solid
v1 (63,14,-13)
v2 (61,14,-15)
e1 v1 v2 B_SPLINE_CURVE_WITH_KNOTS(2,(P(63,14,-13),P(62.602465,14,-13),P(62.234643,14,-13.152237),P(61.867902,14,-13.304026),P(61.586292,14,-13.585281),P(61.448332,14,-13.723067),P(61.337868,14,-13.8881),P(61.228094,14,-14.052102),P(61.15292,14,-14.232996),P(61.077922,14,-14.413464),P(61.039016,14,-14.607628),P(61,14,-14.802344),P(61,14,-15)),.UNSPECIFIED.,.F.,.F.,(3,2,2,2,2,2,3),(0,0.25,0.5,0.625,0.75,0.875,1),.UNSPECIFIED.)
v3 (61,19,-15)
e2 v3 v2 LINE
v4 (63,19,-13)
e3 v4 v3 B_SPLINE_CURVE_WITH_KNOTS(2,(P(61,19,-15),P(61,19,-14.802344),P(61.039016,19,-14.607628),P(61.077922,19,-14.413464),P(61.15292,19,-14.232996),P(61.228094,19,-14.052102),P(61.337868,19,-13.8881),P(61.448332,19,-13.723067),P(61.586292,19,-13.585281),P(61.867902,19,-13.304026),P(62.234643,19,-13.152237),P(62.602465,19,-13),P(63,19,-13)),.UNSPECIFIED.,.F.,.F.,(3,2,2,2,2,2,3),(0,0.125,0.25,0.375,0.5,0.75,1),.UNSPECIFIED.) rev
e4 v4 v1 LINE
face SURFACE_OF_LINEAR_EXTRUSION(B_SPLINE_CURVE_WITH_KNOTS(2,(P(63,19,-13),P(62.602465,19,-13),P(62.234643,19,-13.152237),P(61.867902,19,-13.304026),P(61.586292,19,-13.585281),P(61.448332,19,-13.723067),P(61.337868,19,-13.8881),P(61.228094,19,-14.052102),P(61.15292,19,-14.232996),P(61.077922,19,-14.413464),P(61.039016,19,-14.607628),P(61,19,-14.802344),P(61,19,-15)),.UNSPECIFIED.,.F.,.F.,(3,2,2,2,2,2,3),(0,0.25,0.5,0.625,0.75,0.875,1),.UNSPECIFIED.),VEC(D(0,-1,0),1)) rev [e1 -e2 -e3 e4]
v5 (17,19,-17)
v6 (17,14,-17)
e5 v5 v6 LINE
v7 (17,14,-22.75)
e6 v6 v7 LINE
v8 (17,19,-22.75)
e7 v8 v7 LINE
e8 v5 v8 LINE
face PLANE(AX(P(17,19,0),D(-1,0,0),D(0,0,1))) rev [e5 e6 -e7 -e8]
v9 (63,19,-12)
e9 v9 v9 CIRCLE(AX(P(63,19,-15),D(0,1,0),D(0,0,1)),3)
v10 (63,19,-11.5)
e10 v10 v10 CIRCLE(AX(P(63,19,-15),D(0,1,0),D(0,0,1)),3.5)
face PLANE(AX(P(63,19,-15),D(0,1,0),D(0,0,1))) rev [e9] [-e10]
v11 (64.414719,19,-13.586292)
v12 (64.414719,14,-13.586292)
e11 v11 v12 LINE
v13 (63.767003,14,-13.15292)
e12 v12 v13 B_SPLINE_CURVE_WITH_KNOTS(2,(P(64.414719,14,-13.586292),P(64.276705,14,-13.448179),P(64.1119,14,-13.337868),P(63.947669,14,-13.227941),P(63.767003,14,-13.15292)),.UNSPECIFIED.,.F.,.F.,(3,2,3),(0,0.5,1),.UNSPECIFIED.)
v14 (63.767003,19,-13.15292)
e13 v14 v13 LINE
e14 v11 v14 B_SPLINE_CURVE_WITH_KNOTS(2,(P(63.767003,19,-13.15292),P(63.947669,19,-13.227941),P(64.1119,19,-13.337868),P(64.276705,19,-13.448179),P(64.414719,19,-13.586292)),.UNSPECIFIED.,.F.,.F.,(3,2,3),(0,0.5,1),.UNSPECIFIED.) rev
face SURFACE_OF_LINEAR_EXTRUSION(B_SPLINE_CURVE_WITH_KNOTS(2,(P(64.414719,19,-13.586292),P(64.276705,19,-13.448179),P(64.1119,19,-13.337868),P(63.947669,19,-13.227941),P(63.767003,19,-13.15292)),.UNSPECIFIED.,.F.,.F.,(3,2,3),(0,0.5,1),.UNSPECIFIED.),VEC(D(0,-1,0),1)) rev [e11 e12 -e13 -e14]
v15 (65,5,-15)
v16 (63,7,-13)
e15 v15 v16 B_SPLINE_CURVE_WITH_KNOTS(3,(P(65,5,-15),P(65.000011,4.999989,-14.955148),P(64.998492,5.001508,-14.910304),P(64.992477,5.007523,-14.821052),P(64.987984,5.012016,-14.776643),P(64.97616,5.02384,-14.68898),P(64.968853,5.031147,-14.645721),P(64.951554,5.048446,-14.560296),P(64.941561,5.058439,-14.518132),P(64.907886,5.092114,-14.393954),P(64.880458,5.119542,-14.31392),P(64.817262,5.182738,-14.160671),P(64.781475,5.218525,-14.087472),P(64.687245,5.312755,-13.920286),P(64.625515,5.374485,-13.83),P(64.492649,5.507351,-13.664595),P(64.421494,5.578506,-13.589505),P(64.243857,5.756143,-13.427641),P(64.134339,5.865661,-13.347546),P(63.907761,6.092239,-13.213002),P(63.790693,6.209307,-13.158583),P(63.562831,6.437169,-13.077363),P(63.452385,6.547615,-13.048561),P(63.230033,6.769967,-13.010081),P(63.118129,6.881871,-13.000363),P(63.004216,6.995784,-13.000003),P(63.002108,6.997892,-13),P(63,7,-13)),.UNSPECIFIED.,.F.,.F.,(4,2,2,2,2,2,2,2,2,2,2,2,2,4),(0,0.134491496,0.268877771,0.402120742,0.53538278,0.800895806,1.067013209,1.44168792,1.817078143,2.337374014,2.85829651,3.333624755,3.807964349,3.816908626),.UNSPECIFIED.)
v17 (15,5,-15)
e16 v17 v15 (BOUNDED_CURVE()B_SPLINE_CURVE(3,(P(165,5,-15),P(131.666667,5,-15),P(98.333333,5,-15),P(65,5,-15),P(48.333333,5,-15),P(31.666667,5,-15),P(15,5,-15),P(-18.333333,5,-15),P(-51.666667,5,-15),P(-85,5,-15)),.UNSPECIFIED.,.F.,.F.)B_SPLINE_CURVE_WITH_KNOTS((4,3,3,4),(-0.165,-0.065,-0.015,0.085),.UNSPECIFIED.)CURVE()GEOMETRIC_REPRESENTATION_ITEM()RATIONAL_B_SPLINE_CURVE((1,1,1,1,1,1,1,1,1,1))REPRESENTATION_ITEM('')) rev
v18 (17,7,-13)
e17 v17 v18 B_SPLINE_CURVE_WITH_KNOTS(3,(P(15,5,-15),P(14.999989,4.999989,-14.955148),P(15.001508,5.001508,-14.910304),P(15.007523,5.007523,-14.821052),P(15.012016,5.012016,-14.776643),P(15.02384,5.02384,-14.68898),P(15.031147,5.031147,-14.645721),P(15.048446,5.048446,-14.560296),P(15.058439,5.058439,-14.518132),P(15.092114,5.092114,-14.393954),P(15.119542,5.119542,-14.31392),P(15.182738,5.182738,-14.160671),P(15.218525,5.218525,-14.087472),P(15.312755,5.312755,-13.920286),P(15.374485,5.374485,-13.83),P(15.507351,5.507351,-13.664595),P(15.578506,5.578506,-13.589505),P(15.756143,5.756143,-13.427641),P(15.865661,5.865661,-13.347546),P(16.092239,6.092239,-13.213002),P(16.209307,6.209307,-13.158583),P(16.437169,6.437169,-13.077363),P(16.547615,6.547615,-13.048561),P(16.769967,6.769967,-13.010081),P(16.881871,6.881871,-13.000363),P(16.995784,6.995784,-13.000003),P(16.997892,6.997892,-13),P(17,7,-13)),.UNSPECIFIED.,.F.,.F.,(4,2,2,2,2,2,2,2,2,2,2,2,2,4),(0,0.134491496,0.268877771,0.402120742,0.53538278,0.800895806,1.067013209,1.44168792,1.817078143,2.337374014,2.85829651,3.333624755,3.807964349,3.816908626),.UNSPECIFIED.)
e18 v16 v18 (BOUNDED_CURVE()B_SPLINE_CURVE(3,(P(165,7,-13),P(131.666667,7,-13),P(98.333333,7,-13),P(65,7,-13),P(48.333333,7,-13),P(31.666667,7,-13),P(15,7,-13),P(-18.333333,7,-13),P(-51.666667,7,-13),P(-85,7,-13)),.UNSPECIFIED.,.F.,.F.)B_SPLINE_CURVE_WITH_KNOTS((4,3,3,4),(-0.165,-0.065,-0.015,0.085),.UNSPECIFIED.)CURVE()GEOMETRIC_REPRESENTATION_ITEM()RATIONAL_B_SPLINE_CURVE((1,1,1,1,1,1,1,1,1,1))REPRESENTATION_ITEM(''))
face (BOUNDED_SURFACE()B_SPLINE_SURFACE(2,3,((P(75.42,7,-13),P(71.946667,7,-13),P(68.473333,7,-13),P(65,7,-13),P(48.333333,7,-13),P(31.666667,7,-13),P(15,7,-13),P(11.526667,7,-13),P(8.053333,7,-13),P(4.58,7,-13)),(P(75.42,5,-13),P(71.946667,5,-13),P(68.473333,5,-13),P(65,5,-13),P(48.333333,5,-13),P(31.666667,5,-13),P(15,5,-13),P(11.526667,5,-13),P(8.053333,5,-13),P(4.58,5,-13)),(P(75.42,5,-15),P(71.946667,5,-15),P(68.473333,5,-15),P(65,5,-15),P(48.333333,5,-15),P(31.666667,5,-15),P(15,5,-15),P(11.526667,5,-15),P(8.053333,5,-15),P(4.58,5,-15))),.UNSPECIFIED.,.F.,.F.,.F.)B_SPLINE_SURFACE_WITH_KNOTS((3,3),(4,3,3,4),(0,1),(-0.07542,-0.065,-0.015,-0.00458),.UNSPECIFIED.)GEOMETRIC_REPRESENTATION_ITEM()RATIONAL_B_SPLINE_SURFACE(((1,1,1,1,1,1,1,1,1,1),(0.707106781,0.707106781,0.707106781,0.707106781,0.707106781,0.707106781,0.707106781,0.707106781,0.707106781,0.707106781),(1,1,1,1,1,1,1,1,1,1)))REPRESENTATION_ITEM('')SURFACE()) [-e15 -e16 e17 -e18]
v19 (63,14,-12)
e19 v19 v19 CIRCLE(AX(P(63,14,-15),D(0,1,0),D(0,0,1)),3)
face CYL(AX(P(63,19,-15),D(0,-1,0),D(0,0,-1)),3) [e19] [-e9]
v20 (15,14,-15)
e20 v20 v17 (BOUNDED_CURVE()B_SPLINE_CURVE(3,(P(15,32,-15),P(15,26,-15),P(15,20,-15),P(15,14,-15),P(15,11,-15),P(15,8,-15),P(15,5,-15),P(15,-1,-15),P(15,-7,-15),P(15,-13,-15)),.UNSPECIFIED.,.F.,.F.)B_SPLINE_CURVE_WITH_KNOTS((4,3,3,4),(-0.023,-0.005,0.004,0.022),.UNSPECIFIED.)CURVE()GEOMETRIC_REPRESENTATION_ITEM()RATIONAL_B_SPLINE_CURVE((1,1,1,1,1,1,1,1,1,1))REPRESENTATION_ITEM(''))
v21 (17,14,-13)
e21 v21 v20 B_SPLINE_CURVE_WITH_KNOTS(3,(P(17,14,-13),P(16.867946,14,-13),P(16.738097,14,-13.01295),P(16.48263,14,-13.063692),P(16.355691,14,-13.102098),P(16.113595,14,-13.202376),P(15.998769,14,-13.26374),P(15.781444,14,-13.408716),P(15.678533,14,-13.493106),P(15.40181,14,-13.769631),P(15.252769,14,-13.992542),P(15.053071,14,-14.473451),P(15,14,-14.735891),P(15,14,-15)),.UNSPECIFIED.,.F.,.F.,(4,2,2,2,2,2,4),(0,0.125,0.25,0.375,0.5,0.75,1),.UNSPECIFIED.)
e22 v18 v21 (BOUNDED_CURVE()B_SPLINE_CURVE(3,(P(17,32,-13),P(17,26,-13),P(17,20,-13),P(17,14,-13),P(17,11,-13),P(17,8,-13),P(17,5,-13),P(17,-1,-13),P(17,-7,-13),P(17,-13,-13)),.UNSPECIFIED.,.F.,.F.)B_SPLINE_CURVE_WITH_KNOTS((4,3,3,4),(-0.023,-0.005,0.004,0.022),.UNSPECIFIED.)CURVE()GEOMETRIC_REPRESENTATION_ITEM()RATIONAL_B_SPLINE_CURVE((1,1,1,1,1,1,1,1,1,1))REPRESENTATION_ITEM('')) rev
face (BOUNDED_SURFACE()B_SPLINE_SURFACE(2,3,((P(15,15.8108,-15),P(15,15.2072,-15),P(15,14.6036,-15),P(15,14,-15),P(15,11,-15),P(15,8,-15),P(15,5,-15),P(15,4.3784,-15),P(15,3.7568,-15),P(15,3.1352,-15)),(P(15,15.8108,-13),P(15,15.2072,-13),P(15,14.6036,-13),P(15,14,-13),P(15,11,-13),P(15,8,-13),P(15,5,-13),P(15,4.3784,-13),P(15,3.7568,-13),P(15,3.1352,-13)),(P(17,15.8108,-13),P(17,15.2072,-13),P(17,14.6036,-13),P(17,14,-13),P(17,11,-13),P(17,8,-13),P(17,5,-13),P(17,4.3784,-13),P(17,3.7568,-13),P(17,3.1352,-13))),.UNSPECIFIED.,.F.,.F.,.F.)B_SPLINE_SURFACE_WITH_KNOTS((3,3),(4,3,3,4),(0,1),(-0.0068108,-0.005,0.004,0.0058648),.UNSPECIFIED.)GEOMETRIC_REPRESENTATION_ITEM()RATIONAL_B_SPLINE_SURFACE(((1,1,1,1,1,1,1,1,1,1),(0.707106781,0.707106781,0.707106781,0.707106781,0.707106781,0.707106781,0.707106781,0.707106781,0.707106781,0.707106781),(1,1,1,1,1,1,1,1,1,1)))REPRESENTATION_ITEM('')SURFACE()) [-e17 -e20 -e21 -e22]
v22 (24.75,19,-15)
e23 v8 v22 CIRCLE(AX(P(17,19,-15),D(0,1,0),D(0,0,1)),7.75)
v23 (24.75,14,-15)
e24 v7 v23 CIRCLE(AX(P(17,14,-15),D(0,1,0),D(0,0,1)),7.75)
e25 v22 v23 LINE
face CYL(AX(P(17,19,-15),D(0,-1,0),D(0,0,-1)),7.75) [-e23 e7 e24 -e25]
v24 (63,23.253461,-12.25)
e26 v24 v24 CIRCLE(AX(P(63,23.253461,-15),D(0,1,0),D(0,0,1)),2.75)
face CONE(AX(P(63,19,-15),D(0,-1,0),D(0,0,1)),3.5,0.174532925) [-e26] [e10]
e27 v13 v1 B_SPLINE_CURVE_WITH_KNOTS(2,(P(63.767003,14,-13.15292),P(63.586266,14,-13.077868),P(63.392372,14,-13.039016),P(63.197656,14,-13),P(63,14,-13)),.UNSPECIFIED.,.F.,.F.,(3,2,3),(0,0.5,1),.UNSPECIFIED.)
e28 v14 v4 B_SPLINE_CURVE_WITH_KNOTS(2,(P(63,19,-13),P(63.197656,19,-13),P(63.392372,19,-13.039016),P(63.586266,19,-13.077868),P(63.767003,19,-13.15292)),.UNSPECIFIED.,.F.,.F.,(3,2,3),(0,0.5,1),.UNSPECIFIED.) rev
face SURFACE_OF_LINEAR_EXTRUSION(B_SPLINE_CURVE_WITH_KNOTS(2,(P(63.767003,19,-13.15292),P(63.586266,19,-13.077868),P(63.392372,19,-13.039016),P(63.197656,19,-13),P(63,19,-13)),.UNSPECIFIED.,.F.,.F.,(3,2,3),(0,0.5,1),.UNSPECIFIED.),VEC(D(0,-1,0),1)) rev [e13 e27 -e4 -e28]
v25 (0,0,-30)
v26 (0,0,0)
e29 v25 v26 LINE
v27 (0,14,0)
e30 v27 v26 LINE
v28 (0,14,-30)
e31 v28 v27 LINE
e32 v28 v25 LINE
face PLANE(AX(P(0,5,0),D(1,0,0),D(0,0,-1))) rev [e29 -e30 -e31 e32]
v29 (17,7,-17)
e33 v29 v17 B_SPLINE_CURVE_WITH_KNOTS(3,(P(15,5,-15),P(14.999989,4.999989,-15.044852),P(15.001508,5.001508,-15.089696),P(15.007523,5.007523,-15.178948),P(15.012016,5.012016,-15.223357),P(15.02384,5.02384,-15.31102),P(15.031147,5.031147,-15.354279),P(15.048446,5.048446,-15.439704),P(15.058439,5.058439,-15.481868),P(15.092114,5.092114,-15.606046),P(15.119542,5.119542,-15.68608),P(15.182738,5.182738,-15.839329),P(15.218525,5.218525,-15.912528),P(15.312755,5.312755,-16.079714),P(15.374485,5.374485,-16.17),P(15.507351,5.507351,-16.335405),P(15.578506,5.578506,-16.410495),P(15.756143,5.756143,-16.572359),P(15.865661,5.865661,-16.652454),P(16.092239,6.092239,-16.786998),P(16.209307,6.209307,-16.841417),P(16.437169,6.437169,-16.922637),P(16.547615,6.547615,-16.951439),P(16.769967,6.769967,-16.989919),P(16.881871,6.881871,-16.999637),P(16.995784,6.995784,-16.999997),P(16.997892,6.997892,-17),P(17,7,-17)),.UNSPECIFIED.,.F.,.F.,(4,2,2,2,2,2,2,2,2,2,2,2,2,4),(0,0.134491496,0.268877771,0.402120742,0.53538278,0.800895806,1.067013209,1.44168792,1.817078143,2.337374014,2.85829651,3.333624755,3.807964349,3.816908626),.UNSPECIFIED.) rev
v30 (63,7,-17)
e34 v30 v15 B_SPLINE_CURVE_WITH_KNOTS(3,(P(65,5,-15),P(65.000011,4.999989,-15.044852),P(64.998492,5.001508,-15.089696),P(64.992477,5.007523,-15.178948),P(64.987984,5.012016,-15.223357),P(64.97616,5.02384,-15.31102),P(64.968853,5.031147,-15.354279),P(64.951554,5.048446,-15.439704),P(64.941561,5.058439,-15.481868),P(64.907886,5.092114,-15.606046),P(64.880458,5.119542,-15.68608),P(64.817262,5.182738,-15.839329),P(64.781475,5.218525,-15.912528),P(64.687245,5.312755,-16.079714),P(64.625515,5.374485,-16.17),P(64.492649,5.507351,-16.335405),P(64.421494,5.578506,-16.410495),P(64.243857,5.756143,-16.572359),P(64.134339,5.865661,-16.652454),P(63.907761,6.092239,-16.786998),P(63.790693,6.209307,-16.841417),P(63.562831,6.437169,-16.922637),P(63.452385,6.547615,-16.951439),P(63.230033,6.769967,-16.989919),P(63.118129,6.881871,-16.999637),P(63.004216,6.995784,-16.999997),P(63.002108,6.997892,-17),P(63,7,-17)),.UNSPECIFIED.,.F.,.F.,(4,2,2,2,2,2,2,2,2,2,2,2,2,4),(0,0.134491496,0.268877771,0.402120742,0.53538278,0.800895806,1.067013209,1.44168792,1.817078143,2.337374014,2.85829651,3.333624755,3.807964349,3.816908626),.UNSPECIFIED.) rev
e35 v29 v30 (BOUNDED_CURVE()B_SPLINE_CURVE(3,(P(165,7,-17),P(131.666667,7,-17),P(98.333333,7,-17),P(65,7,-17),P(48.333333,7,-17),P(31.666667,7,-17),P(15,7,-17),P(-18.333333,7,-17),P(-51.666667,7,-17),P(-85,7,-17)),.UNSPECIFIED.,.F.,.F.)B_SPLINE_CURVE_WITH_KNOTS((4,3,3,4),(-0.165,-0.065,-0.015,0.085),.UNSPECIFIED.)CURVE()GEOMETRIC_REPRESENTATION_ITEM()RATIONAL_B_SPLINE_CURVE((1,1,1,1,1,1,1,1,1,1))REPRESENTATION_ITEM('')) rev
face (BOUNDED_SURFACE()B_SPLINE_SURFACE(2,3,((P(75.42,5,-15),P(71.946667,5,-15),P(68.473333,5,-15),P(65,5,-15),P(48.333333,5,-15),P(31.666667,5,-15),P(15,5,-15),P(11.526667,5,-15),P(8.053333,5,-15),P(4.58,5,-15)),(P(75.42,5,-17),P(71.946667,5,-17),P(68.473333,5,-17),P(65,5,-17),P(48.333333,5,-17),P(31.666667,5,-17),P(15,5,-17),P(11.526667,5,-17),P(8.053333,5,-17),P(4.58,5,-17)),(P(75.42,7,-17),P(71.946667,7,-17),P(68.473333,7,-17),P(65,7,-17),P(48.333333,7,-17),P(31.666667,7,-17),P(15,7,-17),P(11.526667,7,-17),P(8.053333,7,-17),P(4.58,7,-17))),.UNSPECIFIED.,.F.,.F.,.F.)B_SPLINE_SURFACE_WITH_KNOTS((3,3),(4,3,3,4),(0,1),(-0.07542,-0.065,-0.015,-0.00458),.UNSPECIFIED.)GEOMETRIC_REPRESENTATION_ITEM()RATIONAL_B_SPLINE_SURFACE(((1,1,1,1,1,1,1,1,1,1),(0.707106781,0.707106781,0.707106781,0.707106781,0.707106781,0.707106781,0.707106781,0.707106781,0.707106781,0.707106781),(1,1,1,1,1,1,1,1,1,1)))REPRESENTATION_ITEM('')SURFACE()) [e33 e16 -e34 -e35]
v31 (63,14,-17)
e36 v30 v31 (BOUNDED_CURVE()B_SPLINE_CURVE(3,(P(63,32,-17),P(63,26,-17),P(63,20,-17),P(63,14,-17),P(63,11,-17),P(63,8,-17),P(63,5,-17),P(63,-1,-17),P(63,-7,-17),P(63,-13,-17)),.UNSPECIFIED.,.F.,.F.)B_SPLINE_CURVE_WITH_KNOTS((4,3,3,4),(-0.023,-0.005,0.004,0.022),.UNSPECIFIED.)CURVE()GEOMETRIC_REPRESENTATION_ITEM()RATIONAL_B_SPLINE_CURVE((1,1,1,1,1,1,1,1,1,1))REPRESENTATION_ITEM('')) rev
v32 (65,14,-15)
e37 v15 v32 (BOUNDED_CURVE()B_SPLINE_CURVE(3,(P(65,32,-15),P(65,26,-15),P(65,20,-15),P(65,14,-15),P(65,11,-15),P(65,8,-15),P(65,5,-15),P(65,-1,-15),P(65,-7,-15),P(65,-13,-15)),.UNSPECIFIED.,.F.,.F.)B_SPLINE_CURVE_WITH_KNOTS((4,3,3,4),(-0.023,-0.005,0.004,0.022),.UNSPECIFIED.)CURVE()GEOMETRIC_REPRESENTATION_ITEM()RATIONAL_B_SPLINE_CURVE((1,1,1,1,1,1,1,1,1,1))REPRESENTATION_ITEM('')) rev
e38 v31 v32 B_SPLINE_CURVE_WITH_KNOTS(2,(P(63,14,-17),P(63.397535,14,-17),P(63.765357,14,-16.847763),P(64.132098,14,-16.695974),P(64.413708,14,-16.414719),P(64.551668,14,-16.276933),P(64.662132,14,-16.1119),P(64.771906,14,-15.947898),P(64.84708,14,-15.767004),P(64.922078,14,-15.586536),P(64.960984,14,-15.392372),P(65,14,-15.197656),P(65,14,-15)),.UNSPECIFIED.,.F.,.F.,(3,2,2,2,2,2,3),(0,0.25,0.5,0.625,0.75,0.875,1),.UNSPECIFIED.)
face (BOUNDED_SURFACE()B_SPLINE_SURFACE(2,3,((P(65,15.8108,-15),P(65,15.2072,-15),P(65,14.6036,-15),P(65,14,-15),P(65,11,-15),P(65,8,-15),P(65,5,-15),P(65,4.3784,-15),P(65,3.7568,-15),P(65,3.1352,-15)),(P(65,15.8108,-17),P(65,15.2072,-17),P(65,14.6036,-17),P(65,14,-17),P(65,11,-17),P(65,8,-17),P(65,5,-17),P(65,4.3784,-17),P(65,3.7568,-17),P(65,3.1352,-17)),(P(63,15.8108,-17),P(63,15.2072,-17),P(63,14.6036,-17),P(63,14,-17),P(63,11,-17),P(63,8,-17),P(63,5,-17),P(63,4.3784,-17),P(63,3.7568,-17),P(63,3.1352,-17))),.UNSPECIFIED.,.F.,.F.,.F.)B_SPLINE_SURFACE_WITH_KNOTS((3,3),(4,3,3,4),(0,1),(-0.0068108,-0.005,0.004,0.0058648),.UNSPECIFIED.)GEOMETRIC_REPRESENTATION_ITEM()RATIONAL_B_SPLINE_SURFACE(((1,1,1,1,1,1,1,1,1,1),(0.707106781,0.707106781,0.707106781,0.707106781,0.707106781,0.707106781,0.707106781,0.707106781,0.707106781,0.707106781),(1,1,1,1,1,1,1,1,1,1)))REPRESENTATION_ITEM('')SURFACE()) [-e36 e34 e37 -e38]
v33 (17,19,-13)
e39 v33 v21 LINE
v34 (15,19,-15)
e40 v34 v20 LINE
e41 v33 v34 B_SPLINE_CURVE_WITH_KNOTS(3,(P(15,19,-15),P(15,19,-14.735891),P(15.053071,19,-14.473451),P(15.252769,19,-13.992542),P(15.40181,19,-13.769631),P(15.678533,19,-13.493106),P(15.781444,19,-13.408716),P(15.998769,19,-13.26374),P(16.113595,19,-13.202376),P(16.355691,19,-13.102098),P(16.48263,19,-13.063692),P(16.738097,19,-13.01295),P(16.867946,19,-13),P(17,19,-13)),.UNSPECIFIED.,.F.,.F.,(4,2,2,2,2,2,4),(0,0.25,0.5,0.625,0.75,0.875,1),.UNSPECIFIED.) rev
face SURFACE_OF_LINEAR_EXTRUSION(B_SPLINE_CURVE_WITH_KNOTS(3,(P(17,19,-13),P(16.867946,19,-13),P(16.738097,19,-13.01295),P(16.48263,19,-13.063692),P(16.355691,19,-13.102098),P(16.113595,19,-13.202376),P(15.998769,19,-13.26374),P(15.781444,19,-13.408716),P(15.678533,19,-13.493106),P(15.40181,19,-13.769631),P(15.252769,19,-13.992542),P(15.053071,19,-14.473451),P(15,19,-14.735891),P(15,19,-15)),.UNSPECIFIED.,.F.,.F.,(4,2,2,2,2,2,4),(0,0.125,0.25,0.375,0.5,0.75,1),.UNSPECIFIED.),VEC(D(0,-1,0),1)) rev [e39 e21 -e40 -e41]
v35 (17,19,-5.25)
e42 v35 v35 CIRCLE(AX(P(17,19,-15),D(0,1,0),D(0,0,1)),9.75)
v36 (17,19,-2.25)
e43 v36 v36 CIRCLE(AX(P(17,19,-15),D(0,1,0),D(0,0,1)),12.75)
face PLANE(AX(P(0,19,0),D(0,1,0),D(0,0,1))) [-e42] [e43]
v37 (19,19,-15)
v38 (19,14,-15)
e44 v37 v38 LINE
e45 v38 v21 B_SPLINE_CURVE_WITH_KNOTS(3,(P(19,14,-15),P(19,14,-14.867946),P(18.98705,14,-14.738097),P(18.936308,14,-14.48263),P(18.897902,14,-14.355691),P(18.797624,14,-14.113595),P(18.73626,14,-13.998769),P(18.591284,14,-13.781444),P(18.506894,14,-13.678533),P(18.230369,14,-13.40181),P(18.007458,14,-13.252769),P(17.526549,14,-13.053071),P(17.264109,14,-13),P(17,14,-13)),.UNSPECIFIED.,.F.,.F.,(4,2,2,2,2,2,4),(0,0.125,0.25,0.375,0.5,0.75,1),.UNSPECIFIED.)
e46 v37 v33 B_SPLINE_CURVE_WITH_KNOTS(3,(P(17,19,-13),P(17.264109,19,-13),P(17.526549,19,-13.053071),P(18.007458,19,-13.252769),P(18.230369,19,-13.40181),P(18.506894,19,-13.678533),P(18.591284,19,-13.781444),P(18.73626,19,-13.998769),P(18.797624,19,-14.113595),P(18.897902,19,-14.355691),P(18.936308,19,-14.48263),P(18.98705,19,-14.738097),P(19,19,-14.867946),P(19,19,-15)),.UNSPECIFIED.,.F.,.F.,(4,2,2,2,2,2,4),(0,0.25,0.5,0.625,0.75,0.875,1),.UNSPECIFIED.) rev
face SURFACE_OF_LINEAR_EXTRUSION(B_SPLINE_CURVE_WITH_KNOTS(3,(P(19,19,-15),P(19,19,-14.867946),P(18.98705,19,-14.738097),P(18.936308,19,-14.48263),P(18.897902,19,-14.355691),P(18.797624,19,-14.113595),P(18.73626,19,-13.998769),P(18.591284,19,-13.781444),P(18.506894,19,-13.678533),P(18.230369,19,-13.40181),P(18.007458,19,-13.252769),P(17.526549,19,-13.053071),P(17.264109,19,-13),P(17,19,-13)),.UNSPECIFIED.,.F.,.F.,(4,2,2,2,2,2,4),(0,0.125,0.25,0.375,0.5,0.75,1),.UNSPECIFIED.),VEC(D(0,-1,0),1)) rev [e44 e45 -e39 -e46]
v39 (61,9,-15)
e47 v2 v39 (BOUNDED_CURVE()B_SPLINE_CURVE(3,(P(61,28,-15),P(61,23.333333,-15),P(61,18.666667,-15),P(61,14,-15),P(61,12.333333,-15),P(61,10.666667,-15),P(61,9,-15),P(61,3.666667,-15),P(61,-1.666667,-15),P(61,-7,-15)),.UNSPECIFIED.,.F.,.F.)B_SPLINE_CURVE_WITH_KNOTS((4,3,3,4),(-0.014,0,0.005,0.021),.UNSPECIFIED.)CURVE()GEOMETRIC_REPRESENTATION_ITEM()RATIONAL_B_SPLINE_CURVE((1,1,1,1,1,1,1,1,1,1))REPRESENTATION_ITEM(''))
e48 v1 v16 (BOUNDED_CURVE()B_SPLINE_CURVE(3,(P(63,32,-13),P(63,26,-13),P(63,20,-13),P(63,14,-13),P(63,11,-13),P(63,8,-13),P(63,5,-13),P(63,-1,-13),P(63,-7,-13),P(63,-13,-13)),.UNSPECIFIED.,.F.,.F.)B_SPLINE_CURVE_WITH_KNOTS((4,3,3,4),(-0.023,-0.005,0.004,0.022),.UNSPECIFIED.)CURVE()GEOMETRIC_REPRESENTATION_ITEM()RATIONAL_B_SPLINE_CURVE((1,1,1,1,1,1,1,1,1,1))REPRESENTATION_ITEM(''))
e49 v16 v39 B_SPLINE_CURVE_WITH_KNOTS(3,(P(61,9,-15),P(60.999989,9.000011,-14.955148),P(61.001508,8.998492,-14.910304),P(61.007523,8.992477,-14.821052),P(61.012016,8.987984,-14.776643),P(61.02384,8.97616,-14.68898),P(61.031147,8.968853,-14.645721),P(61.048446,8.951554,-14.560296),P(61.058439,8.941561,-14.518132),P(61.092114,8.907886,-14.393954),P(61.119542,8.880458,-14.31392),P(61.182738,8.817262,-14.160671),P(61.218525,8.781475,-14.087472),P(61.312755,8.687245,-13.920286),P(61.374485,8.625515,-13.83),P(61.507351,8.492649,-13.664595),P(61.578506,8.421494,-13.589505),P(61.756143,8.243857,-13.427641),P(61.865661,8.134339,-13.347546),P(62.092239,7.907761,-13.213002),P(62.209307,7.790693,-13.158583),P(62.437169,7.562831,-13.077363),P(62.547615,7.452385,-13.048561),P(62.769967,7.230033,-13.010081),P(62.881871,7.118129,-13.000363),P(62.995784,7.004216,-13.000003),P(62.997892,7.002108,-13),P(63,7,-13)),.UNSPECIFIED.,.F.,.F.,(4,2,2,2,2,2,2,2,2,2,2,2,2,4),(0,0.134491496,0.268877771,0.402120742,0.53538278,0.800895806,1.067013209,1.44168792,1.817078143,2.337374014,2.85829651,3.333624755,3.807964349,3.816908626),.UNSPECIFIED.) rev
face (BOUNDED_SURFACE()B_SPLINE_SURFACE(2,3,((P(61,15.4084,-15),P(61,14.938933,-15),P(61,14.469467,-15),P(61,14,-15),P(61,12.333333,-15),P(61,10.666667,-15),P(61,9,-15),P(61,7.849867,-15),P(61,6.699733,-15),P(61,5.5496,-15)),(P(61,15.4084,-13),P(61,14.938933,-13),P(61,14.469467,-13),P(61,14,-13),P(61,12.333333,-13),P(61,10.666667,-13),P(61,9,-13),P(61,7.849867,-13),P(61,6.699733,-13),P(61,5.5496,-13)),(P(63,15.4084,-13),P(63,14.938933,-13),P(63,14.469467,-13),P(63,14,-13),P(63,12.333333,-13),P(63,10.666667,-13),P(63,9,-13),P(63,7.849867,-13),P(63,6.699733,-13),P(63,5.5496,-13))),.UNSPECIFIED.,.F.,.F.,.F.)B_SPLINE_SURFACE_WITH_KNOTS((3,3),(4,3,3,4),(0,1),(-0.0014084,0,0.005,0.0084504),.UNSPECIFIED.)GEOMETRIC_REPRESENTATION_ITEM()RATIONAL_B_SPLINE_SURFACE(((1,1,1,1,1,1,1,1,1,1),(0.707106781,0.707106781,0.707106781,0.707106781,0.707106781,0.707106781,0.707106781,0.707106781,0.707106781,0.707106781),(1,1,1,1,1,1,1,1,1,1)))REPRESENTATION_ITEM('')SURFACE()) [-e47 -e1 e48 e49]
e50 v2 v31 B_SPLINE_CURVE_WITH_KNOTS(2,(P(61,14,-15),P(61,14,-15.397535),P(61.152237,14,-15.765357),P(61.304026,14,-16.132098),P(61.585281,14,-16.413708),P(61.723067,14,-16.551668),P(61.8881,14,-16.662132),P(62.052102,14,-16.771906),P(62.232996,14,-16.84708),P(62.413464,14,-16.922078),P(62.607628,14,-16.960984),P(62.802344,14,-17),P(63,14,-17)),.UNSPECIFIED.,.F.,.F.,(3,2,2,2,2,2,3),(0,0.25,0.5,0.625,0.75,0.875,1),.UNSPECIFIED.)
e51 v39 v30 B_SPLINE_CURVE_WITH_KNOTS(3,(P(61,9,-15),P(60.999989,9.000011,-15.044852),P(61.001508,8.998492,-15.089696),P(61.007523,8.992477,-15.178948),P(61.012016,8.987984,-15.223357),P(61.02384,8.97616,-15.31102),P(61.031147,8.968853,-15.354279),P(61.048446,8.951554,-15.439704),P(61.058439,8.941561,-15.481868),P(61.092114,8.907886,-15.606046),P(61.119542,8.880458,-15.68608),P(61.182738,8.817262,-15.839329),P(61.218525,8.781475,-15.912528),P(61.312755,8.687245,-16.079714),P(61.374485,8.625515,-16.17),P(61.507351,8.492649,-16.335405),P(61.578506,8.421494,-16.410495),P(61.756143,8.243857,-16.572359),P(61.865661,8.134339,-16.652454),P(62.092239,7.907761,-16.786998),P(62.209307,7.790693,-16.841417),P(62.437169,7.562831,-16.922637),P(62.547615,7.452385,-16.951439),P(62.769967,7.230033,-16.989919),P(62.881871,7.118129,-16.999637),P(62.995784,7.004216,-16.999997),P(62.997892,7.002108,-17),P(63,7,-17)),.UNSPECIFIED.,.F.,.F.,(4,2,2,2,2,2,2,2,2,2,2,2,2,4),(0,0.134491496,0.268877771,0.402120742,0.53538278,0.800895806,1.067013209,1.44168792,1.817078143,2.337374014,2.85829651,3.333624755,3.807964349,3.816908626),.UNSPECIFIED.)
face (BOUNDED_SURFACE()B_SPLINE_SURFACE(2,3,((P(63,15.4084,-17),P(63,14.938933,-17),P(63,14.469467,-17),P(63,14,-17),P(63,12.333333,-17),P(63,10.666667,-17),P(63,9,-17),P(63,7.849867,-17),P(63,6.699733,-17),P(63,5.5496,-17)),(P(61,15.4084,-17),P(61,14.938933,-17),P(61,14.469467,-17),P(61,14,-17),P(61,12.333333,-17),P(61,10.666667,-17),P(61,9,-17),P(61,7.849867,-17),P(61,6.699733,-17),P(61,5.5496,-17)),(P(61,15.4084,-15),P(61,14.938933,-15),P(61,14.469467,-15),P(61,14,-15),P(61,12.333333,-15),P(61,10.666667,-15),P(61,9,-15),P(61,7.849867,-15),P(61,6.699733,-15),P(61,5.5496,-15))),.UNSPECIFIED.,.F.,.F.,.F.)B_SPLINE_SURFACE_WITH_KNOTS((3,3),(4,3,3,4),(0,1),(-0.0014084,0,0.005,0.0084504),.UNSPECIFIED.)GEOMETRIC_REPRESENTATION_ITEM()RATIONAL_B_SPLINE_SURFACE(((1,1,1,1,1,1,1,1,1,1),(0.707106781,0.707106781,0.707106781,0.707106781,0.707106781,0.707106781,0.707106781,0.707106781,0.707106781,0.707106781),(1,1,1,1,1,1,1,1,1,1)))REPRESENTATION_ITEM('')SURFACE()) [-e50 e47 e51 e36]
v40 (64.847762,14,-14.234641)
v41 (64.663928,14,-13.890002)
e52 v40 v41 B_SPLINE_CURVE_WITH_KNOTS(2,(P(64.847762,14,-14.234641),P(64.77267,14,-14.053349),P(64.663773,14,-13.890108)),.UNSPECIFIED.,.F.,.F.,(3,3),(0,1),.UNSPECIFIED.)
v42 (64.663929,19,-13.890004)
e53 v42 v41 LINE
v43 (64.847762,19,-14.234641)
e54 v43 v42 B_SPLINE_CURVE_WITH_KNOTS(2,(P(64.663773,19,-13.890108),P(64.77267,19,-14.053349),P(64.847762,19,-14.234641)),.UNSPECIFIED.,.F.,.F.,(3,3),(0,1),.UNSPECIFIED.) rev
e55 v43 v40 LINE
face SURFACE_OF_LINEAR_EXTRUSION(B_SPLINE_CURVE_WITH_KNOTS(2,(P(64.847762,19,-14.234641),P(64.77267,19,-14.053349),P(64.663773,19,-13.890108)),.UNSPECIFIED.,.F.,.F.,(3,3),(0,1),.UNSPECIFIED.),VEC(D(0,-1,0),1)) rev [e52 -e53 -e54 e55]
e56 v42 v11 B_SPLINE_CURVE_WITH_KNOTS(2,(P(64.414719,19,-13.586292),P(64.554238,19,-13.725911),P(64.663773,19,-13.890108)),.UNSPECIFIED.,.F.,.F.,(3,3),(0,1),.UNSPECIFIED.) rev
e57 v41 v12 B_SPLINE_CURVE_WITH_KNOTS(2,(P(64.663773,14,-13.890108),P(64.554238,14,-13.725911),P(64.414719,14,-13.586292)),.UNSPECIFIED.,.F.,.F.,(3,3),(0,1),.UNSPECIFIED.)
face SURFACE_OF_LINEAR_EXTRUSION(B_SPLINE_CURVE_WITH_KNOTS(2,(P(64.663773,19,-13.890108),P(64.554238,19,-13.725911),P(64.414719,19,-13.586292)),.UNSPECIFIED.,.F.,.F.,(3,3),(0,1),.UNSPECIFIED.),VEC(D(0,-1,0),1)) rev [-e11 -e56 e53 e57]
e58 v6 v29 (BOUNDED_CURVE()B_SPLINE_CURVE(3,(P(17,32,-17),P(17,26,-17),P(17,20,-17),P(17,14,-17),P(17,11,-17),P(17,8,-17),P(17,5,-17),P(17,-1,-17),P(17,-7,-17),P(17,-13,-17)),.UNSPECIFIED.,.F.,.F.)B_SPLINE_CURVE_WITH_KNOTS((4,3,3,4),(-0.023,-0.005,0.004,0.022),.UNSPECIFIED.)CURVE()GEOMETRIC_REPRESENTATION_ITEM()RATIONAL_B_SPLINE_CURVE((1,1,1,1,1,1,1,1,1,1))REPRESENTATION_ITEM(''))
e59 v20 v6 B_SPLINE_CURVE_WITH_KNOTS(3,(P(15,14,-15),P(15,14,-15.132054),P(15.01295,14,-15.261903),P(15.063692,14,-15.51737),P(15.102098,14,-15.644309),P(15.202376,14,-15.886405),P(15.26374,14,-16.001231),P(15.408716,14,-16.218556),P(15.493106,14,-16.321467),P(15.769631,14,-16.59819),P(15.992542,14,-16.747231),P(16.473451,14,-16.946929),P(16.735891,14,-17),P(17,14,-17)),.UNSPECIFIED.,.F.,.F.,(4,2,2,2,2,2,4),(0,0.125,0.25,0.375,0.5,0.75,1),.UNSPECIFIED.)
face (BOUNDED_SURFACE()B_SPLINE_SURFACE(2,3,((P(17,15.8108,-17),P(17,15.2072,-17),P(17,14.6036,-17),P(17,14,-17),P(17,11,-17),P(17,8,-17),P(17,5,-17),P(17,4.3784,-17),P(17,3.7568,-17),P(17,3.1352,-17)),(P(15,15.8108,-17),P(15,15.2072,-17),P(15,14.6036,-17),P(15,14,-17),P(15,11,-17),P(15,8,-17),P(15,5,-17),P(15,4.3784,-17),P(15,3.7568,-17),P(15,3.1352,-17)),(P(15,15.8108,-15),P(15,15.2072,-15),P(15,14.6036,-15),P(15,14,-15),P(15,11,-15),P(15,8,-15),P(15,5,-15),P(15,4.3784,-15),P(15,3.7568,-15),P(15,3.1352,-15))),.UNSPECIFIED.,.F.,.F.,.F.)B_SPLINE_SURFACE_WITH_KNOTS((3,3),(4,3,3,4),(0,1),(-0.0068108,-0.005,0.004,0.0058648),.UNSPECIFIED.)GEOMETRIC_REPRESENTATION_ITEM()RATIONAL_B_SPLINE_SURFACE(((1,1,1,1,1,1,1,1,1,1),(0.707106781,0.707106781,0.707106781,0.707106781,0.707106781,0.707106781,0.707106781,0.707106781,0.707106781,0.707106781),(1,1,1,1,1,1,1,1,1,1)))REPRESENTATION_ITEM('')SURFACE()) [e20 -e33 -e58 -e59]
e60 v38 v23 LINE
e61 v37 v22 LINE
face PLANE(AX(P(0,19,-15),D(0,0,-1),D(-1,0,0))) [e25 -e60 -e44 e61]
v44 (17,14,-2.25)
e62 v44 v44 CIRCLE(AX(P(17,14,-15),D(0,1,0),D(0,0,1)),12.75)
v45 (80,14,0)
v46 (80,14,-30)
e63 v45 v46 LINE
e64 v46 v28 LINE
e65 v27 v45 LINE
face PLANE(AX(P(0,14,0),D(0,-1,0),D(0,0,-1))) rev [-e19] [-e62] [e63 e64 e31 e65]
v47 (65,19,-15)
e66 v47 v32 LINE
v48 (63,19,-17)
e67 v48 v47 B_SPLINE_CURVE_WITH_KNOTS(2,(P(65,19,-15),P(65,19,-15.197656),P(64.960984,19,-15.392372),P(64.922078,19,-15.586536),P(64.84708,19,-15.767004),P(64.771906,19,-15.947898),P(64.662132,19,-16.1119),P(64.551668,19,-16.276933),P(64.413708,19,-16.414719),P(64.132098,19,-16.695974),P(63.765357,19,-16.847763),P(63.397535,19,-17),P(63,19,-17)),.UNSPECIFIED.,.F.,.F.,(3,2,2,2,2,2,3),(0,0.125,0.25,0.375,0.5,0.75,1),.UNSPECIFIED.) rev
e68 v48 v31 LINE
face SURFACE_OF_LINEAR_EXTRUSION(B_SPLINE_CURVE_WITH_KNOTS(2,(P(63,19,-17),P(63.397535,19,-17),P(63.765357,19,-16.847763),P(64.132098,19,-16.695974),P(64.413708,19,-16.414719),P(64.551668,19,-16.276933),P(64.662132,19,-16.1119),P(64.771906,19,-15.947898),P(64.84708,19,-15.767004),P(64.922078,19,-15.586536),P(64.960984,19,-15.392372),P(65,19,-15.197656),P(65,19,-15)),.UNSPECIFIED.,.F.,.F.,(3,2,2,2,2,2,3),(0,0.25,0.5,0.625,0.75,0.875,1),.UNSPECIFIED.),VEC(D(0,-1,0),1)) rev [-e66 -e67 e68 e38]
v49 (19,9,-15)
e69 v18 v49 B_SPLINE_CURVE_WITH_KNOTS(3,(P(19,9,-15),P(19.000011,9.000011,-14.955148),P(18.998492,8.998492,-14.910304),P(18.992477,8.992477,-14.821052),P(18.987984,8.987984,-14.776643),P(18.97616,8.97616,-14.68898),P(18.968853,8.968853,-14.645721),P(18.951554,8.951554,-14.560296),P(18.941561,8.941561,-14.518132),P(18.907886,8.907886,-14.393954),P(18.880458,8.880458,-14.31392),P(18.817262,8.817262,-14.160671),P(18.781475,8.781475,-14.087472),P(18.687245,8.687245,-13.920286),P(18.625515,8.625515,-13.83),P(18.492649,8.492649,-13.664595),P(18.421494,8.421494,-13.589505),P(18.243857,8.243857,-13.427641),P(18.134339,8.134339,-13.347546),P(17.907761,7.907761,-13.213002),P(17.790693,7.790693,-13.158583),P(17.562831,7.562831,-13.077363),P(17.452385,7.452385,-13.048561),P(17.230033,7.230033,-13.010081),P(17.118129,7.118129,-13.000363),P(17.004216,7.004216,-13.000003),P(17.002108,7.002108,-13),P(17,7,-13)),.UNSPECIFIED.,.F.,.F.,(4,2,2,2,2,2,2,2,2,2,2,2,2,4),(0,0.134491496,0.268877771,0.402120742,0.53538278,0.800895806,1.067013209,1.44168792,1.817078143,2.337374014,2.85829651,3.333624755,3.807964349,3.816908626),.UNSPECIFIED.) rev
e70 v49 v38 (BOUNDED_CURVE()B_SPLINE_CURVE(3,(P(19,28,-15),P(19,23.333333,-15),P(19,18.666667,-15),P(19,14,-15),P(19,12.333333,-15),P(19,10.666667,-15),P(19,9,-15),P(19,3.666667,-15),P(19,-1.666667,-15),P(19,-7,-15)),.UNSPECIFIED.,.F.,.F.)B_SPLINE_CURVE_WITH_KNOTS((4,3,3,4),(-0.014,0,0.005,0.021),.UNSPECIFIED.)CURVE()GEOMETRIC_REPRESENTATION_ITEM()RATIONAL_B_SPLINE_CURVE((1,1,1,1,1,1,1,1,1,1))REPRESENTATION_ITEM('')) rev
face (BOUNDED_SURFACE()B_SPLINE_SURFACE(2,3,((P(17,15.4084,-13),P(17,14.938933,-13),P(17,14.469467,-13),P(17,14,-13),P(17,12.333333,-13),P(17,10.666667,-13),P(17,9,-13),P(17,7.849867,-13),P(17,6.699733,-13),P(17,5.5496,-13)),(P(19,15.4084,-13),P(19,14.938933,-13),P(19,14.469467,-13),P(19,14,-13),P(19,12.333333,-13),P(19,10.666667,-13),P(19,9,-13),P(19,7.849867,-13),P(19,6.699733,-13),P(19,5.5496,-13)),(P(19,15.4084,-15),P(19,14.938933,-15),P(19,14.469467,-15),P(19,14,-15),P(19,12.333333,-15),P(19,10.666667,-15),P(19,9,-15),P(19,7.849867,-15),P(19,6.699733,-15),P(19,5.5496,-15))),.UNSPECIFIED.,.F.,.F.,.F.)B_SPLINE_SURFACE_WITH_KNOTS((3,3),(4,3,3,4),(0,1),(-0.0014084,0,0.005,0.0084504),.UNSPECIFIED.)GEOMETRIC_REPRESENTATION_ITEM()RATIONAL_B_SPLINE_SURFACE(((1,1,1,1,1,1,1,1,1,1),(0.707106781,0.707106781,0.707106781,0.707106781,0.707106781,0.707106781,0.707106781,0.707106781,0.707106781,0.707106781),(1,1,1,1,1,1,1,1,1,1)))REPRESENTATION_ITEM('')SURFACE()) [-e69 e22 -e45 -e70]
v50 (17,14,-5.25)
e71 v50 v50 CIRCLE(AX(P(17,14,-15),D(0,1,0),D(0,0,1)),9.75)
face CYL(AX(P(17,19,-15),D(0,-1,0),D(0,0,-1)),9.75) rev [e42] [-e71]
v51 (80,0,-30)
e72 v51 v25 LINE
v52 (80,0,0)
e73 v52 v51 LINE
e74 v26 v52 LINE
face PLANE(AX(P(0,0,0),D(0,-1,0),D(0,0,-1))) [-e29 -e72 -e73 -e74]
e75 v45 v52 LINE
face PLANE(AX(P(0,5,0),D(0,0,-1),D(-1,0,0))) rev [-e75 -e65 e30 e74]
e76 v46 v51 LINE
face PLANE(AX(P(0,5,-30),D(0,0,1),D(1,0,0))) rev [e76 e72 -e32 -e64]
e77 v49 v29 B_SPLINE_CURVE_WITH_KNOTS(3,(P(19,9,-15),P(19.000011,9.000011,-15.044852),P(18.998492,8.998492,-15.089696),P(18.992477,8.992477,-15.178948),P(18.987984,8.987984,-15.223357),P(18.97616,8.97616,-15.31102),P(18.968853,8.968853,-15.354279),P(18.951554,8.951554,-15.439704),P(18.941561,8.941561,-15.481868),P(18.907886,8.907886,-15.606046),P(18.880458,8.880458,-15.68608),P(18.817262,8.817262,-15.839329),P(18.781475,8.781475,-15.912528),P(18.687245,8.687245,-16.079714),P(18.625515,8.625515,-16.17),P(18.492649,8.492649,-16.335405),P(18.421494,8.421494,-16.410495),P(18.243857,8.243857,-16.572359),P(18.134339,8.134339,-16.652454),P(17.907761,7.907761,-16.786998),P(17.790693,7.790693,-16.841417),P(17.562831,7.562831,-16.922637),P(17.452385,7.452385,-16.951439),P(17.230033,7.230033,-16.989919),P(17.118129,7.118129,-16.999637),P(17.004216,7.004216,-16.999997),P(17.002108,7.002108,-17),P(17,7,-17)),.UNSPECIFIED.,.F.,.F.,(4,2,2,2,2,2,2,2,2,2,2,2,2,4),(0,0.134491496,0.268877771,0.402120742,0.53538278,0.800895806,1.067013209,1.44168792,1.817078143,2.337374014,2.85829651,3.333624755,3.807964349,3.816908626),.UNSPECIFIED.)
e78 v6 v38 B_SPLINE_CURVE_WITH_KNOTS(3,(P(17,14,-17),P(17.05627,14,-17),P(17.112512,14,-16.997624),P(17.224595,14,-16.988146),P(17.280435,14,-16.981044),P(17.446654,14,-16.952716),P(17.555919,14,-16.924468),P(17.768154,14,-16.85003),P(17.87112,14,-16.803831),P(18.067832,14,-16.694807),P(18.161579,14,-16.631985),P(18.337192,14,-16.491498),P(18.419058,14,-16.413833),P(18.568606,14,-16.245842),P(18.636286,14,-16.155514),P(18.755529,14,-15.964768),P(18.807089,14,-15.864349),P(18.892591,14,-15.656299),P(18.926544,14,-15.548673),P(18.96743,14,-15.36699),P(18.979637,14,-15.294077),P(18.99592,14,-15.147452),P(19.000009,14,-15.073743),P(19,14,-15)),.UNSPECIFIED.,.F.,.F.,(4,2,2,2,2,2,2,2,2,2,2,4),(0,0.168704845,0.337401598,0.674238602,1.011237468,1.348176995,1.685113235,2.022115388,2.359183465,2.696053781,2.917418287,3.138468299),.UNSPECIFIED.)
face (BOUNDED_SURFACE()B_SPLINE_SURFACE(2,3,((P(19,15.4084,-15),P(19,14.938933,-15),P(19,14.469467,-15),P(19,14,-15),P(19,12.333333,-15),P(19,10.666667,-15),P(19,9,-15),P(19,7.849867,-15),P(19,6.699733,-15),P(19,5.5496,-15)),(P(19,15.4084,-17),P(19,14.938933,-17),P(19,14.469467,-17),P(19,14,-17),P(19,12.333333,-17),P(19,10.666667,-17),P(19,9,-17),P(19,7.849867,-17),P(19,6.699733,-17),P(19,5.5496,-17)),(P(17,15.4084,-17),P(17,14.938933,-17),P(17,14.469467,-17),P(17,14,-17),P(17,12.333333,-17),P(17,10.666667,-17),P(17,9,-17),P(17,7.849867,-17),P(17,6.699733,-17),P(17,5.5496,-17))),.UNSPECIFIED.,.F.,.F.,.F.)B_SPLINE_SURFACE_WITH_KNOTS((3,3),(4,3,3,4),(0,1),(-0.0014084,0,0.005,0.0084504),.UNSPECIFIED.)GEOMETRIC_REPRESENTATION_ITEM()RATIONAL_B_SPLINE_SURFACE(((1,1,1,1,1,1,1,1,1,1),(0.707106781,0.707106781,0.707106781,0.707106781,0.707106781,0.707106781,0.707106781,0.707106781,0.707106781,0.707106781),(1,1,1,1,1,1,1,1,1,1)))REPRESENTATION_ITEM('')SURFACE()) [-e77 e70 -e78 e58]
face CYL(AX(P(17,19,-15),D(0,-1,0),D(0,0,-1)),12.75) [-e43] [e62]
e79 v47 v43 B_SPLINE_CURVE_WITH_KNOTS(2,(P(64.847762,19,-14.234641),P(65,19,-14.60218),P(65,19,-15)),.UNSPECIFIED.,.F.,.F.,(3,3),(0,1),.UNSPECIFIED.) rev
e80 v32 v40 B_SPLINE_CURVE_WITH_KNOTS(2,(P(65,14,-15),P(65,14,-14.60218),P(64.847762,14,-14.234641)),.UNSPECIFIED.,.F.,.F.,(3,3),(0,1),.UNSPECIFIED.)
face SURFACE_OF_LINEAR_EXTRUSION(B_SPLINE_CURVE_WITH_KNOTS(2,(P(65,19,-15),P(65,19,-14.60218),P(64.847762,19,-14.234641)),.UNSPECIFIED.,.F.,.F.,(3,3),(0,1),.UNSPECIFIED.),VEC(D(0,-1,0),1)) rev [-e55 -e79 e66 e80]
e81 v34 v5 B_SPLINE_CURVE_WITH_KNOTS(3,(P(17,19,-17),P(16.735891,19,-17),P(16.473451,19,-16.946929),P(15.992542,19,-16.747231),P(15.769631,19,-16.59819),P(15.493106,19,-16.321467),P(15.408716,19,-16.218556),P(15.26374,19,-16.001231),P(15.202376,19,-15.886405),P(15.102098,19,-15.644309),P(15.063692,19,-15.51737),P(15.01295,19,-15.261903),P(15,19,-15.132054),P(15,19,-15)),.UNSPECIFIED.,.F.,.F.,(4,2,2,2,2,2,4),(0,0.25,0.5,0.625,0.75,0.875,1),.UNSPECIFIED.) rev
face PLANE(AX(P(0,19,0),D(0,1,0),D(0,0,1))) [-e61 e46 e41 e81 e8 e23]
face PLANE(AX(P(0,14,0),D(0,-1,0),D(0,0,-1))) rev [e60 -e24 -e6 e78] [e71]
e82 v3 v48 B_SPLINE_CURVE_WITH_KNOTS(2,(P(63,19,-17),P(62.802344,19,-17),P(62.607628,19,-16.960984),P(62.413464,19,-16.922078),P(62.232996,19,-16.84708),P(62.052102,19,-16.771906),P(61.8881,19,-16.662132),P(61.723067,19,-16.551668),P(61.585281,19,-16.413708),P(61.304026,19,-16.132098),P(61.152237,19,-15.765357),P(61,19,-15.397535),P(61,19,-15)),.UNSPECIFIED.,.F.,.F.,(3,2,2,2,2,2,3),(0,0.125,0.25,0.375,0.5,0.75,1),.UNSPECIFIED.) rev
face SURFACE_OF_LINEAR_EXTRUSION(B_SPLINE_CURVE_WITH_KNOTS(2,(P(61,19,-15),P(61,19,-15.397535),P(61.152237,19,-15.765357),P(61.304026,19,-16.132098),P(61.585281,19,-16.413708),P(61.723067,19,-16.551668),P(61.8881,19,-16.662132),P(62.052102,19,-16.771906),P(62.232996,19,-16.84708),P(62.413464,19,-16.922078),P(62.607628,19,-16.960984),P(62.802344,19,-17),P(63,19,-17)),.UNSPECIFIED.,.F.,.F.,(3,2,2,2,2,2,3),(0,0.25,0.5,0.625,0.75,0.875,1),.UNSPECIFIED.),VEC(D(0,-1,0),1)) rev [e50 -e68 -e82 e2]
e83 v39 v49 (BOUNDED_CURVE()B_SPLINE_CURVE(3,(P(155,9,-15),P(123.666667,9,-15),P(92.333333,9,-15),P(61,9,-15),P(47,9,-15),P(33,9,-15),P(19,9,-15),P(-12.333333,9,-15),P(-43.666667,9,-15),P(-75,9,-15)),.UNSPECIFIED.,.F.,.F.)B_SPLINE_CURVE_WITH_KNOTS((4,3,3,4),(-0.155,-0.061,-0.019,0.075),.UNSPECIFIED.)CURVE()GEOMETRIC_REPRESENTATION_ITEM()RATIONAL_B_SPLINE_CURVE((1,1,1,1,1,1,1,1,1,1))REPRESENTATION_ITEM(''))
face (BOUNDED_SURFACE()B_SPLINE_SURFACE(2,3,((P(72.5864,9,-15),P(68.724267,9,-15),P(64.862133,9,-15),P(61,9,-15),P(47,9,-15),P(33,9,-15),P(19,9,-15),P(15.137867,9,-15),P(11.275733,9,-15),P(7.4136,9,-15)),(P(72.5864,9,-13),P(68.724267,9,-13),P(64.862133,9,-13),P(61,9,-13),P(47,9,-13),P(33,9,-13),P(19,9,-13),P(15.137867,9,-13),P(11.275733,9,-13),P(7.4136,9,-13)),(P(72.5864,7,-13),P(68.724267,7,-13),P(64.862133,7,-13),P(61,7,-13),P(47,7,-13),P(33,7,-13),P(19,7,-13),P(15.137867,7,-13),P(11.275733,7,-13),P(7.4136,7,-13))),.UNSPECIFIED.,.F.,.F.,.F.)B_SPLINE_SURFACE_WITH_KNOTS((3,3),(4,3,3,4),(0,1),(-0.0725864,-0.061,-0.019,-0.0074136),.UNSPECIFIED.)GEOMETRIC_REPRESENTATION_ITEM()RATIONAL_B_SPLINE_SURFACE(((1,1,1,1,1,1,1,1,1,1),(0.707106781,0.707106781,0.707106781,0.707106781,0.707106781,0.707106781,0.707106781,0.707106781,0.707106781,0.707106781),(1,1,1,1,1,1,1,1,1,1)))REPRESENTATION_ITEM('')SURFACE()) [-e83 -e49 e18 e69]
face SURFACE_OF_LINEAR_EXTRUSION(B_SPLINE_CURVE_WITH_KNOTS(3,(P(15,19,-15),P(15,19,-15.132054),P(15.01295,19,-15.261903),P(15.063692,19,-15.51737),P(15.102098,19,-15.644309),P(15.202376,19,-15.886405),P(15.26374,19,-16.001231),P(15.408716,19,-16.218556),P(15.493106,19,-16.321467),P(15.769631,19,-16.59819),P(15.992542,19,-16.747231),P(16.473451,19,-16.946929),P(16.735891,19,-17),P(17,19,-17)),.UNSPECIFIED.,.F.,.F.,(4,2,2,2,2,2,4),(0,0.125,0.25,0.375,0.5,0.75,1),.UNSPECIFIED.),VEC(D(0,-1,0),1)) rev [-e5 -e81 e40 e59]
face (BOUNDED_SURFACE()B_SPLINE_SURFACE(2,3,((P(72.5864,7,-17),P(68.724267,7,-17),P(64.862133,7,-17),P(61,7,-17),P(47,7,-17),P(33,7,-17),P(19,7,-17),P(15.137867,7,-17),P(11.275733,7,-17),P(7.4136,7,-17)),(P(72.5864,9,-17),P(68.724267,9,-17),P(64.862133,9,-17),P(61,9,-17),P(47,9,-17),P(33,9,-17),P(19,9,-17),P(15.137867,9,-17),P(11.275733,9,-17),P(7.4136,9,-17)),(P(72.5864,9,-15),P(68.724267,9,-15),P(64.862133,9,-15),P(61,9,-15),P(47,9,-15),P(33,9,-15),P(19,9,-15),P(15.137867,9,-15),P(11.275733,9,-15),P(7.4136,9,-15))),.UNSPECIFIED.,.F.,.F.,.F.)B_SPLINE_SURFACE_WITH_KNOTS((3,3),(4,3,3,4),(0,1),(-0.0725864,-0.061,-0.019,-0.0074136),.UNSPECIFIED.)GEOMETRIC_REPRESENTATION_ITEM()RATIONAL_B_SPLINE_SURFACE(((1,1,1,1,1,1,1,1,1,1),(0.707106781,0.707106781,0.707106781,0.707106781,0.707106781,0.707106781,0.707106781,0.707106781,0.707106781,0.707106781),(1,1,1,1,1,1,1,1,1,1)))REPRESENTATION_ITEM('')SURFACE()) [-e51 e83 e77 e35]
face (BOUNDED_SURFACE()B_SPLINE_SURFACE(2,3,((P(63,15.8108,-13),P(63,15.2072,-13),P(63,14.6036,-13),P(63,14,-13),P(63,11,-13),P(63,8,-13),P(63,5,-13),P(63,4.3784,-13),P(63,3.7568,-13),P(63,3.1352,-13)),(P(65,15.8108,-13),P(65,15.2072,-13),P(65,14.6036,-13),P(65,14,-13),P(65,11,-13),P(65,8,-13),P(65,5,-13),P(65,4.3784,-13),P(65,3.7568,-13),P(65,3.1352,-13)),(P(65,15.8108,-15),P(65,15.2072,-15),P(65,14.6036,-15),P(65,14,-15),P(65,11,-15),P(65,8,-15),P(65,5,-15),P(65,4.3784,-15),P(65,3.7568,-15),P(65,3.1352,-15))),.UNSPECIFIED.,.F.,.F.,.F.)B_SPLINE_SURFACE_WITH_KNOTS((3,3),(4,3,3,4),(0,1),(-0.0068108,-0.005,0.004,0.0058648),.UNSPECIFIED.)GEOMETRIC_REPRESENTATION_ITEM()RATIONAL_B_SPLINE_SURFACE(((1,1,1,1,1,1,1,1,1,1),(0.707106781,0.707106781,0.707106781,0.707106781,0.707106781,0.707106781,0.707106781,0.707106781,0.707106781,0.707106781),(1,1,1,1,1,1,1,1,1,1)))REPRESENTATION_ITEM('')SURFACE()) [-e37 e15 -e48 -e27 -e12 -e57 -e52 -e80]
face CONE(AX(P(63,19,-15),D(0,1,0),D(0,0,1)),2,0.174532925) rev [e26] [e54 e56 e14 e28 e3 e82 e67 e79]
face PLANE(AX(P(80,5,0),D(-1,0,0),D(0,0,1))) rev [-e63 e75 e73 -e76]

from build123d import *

# Parameters (mm, degrees)
SKETCH1_W                 = 80
SKETCH1_H                 = 30
BOSS_EXTRUDE1_DEPTH       = 5
SKETCH2_W                 = 80
SKETCH2_H                 = 30
SKETCH2_W_2               = 50
SKETCH2_H_2               = 4
BOSS_EXTRUDE2_DEPTH       = 4
SKETCH3_W                 = 80
SKETCH3_H                 = 30
SKETCH3_W_2               = 4
SKETCH3_H_2               = 4
BOSS_EXTRUDE4_DEPTH       = 5
VARFILLET2_R              = 2
BOSS_EXTRUDE5_OUTLINE_R   = 12.75
BOSS_EXTRUDE5_OUTLINE_R_2 = 9.75
BOSS_EXTRUDE5_DEPTH       = 5
SKETCH10_R                = 3
BOSS_EXTRUDE8_DEPTH       = 5
SKETCH12_R                = 3.5
SKETCH12_R_2              = 2
BOSS_EXTRUDE9_DEPTH       = 5
BOSS_EXTRUDE9_TAPER       = 10


# Read off the part's stored shape, not the designer's step: Boss-Extrude5
with BuildPart() as part:
    # Sketch1 → Boss-Extrude1 (new body)
    with BuildSketch(Plane(origin=(0, 0, 0), x_dir=(1, 0, 0), z_dir=(0, 1, 0))):
        with Locations((40, 15)):
            Rectangle(SKETCH1_W, SKETCH1_H)
    extrude(amount=BOSS_EXTRUDE1_DEPTH)

    # Sketch2 → Boss-Extrude2 (add)
    with BuildSketch(Plane(origin=(0, 5, 0), x_dir=(1, 0, 0), z_dir=(0, 1, 0))):
        with Locations((40, 15)):
            Rectangle(SKETCH2_W, SKETCH2_H)
        with Locations((40, 15)):
            Rectangle(SKETCH2_W_2, SKETCH2_H_2, mode=Mode.SUBTRACT)
    extrude(amount=BOSS_EXTRUDE2_DEPTH)

    # Sketch3 → Boss-Extrude4 (add)
    with BuildSketch(Plane(origin=(0, 9, 0), x_dir=(1, 0, 0), z_dir=(0, 1, 0))):
        with Locations((40, 15)):
            Rectangle(SKETCH3_W, SKETCH3_H)
        with Locations((17, 15)):
            Rectangle(SKETCH3_W_2, SKETCH3_H_2, mode=Mode.SUBTRACT)
        with Locations((63, 15)):
            Rectangle(SKETCH3_W_2, SKETCH3_H_2, mode=Mode.SUBTRACT)
    extrude(amount=BOSS_EXTRUDE4_DEPTH)

    # VarFillet2
    varfillet2_edges = [part.edges().sort_by_distance(p)[0] for p in [
        (19, 11.5, -13),
        (15, 9.5, -13),
        (15, 9.5, -17),
        (19, 11.5, -17),
        (40, 5, -13),
        (40, 9, -17),
        (40, 5, -17),
        (40, 9, -13),
        (61, 11.5, -17),
        (61, 11.5, -13),
        (65, 9.5, -17),
        (65, 9.5, -13),
    ]]
    fillet(varfillet2_edges, radius=VARFILLET2_R - 0.0001)  # a hair under: the kernel refuses the full size

    # Boss-Extrude5 outline → Boss-Extrude5 (add)
    # profile 1 of 2: a face of its own
    with BuildSketch(Plane(origin=(0, 14, 0), x_dir=(1, 0, 0), z_dir=(0, 1, 0))):
        with Locations((17, 15)):
            Circle(BOSS_EXTRUDE5_OUTLINE_R)
        with Locations((17, 15)):
            Circle(BOSS_EXTRUDE5_OUTLINE_R_2, mode=Mode.SUBTRACT)
    # profile 2 of 2: a face of its own
    with BuildSketch(Plane(origin=(0, 14, 0), x_dir=(1, 0, 0), z_dir=(0, 1, 0))):
        with BuildLine():
            Line((24.75, 15), (19, 15))
            add(Edge.make_bspline(
                [(19, 15), (19, 14.867945742), (18.987049656, 14.738096965), (18.936307764, 14.482629939), (18.897902055, 14.355690865), (18.797624318, 14.113595306), (18.736259729, 13.998768696), (18.591283808, 13.781444375), (18.506894302, 13.678533287), (18.230368557, 13.401809755), (18.007457904, 13.252768845), (17.526549216, 13.053070607), (17.264108516, 13), (17, 13)],
                knots=[0, 0, 0, 0, 0.125, 0.125, 0.25, 0.25, 0.375, 0.375, 0.5, 0.5, 0.75, 0.75, 1, 1, 1, 1], degree=3))
            add(Edge.make_bspline(
                [(17, 13), (16.867945742, 13), (16.738096965, 13.012950344), (16.482629939, 13.063692236), (16.355690865, 13.102097945), (16.113595306, 13.202375682), (15.998768696, 13.263740271), (15.781444375, 13.408716192), (15.678533287, 13.493105698), (15.401809755, 13.769631443), (15.252768845, 13.992542096), (15.053070607, 14.473450784), (15, 14.735891484), (15, 15)],
                knots=[0, 0, 0, 0, 0.125, 0.125, 0.25, 0.25, 0.375, 0.375, 0.5, 0.5, 0.75, 0.75, 1, 1, 1, 1], degree=3))
            add(Edge.make_bspline(
                [(15, 15), (15, 15.132054258), (15.012950344, 15.261903035), (15.063692236, 15.517370061), (15.102097945, 15.644309135), (15.202375682, 15.886404694), (15.263740271, 16.001231304), (15.408716192, 16.218555625), (15.493105698, 16.321466713), (15.769631443, 16.598190245), (15.992542096, 16.747231155), (16.473450784, 16.946929393), (16.735891484, 17), (17, 17)],
                knots=[0, 0, 0, 0, 0.125, 0.125, 0.25, 0.25, 0.375, 0.375, 0.5, 0.5, 0.75, 0.75, 1, 1, 1, 1], degree=3))
            Line((17, 17), (17, 22.75))
            ThreePointArc((17, 22.75), (11.519922446, 9.519922446), (24.75, 15))
        make_face()
    extrude(amount=BOSS_EXTRUDE5_DEPTH)

    # Sketch10 → Boss-Extrude8 (add)
    with BuildSketch(Plane(origin=(0, 14, 0), x_dir=(1, 0, 0), z_dir=(0, 1, 0))):
        with Locations(Location((63, 15, 0), (0, 0, 270))):
            Circle(SKETCH10_R)
        with BuildLine():
            ThreePointArc((63, 13), (61.585786438, 13.585786438), (61, 15))
            ThreePointArc((61, 15), (61.585786438, 16.414213562), (63, 17))
            ThreePointArc((63, 17), (64.414213562, 16.414213562), (65, 15))
            ThreePointArc((65, 15), (64.414213562, 13.585786438), (63, 13))
        make_face(mode=Mode.SUBTRACT)
    extrude(amount=BOSS_EXTRUDE8_DEPTH)

    # Sketch12 → Boss-Extrude9 (add)
    with BuildSketch(Plane(origin=(0, 19, 0), x_dir=(1, 0, 0), z_dir=(0, 1, 0))):
        with Locations((63, 15)):
            Circle(SKETCH12_R)
        with Locations((63, 15)):
            Circle(SKETCH12_R_2, mode=Mode.SUBTRACT)
    extrude(amount=BOSS_EXTRUDE9_DEPTH, taper=BOSS_EXTRUDE9_TAPER)


solid = part.part
